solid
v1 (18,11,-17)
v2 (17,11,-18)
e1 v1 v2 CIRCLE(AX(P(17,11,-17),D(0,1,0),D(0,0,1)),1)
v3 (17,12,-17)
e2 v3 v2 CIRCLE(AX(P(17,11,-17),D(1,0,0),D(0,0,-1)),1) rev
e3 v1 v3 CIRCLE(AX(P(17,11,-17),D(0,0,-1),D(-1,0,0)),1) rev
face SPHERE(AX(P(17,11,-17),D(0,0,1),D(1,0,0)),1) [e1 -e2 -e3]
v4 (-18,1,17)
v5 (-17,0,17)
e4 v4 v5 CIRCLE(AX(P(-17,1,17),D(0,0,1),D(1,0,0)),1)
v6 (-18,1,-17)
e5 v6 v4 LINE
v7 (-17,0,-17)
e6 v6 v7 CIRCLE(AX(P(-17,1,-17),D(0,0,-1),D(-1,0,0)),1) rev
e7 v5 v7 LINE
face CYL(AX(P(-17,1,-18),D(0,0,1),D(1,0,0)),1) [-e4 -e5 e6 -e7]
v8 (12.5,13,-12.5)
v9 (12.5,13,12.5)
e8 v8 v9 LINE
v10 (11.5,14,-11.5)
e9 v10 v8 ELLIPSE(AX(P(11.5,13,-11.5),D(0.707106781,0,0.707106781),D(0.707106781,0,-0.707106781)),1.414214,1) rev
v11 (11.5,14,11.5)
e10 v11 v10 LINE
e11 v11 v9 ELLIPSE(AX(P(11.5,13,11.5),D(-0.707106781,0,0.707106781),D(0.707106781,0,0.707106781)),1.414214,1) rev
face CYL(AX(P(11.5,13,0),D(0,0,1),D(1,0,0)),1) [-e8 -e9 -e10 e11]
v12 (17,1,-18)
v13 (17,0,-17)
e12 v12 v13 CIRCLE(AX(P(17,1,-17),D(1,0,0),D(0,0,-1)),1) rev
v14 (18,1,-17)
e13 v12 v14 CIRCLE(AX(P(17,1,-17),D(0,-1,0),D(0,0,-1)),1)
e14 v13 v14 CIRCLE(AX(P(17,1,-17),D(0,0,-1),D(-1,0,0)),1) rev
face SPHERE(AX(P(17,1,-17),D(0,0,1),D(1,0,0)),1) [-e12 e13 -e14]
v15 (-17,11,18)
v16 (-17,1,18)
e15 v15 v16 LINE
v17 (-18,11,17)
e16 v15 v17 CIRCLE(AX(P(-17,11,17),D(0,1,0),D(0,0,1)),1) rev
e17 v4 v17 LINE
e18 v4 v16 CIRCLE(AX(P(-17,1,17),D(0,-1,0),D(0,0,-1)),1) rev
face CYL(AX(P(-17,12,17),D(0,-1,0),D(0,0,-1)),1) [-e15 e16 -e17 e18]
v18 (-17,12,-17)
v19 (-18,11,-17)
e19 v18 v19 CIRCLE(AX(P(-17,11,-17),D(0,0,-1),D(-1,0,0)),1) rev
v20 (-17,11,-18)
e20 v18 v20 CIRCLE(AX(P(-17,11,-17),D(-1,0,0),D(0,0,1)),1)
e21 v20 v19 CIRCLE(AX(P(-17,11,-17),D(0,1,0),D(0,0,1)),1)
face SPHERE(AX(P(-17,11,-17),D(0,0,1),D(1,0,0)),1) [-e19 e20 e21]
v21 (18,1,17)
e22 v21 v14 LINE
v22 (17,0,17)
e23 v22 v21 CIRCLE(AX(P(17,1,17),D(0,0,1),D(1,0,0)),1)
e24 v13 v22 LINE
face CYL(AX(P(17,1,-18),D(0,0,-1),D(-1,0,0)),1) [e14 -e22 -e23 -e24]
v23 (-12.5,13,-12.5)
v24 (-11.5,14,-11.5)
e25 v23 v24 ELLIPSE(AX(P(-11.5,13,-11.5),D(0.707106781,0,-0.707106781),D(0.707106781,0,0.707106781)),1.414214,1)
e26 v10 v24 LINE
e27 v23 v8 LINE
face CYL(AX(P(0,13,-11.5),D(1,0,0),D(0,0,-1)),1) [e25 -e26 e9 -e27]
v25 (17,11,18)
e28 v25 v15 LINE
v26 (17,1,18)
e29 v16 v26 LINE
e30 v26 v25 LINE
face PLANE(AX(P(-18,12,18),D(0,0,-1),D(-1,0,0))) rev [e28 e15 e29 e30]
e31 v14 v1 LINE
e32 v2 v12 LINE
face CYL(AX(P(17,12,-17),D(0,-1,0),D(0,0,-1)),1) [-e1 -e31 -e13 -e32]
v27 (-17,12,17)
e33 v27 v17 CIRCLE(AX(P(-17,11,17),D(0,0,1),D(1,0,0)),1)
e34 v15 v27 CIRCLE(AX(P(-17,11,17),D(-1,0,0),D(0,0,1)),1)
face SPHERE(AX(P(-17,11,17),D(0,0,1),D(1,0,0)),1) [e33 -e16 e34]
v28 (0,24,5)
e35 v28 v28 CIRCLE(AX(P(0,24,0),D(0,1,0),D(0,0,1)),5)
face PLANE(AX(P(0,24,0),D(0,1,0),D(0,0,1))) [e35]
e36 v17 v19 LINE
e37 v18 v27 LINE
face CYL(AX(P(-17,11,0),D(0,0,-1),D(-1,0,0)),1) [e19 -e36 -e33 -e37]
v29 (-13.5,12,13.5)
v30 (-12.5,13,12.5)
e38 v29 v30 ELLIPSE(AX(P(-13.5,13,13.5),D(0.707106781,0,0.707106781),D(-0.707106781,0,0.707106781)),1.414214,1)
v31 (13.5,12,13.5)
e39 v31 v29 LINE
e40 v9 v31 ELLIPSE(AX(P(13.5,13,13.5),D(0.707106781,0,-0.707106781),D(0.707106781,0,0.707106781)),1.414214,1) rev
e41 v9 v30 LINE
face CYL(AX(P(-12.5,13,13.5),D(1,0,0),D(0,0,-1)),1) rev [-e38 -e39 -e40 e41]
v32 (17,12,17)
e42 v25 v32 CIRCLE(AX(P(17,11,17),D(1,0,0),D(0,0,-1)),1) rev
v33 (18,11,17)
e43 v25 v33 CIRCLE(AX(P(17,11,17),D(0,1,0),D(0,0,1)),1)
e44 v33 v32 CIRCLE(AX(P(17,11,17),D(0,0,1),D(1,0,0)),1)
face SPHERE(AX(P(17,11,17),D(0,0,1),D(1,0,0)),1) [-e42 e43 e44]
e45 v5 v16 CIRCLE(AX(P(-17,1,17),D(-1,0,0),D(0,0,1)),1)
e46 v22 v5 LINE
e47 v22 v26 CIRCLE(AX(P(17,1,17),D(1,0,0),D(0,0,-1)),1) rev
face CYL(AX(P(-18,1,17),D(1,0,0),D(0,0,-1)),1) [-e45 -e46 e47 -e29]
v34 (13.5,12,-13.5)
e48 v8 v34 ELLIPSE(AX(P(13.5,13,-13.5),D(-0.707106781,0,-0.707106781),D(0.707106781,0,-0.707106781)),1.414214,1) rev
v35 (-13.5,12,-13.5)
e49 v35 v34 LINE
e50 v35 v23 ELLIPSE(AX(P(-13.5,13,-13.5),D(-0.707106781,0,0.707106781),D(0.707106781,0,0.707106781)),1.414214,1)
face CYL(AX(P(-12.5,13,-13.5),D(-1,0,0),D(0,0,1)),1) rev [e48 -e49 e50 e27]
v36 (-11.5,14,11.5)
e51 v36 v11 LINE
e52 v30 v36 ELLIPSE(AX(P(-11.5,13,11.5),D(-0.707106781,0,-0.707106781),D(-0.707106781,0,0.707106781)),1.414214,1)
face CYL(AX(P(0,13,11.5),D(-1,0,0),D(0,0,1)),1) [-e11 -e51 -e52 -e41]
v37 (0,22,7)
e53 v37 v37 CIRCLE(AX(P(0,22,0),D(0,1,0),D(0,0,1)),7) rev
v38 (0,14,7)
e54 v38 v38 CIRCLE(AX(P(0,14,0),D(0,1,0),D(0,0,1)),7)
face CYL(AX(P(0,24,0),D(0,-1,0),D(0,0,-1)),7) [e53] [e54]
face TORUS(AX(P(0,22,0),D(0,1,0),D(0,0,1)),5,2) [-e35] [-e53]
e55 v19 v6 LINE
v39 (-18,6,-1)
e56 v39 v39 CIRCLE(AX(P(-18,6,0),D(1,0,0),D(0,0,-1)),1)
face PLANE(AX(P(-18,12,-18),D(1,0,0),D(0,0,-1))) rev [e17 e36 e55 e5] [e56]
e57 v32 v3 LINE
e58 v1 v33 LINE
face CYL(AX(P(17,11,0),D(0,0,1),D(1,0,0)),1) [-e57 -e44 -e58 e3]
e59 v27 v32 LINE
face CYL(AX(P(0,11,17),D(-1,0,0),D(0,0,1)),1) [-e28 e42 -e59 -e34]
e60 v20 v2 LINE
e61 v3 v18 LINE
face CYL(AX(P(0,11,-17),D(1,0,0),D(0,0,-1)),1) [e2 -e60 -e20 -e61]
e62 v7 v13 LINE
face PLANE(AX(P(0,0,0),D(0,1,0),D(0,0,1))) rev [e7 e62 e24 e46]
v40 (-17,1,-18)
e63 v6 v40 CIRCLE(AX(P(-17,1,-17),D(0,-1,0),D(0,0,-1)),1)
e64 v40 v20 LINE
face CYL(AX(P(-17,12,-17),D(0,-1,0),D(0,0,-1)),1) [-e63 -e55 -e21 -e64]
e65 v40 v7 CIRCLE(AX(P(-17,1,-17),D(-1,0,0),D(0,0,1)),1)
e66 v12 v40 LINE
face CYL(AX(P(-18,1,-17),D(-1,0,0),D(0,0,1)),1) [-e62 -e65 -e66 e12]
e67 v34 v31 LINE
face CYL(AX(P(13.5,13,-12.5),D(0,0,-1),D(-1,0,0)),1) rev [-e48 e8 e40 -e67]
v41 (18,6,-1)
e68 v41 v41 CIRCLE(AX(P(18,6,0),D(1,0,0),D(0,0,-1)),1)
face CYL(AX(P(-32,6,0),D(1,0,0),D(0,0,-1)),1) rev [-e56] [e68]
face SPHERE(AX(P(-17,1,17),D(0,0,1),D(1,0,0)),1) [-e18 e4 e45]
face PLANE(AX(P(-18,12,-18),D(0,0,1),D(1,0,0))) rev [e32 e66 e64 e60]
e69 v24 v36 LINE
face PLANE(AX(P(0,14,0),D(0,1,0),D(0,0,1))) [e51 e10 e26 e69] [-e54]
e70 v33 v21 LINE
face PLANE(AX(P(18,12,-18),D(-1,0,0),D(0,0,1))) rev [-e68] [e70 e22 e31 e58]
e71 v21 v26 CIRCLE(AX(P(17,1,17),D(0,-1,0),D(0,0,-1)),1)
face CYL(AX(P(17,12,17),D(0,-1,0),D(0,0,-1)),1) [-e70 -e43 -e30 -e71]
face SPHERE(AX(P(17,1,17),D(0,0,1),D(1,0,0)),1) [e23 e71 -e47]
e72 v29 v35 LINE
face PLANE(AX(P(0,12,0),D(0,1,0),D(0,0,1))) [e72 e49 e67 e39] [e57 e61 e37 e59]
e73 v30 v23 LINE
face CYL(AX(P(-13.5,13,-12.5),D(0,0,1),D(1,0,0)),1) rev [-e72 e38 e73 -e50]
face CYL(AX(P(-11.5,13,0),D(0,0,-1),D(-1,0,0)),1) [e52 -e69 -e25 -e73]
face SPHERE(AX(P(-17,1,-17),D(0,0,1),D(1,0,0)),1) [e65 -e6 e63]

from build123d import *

# Parameters (mm, degrees)
SKETCH_1_W          = 36
SKETCH_1_H          = 36
EXTRUDE_1_DEPTH     = 12
SKETCH_2_W          = 25
SKETCH_2_H          = 25
EXTRUDE_2_DEPTH     = 2
SKETCH_3_R          = 7
EXTRUDE_3_DEPTH     = 10
FILLET_1_R          = 2
FILLET_2_R          = 1
FILLET_3_R          = 1
SKETCH_4_R          = 1
CUT_EXTRUDE_1_DEPTH = 50


with BuildPart() as part:
    # 草图1 → 凸台-拉伸1 (new body)
    with BuildSketch(Plane(origin=(0, 0, 0), x_dir=(1, 0, 0), z_dir=(0, 1, 0))):
        Rectangle(SKETCH_1_W, SKETCH_1_H)
    extrude(amount=EXTRUDE_1_DEPTH)

    # 草图2 → 凸台-拉伸2 (add)
    with BuildSketch(Plane(origin=(0, 12, 0), x_dir=(1, 0, 0), z_dir=(0, 1, 0))):
        Rectangle(SKETCH_2_W, SKETCH_2_H)
    extrude(amount=EXTRUDE_2_DEPTH)

    # 草图3 → 凸台-拉伸3 (add)
    with BuildSketch(Plane(origin=(0, 14, 0), x_dir=(1, 0, 0), z_dir=(0, 1, 0))):
        with Locations(Location((0, 0, 0), (0, 0, 270))):
            Circle(SKETCH_3_R)
    extrude(amount=EXTRUDE_3_DEPTH)

    # 圆角1
    fillet_1_edges = [part.edges().sort_by_distance(p)[0] for p in [
        (0, 24, -7),
    ]]
    fillet(fillet_1_edges, radius=FILLET_1_R)

    # 圆角2
    fillet_2_edges = [part.edges().sort_by_distance(p)[0] for p in [
        (0, 12, -12.5),
        (12.5, 12, 0),
        (0, 12, 12.5),
        (-12.5, 14, 0),
        (-12.5, 12, 0),
        (0, 14, 12.5),
        (12.5, 14, 0),
        (0, 14, -12.5),
    ]]
    fillet(fillet_2_edges, radius=FILLET_2_R - 0.0001)  # a hair under: the kernel refuses the full size

    # 圆角3
    fillet_3_edges = [part.edges().sort_by_distance(p)[0] for p in [
        (-18, 12, 0),
        (0, 12, 18),
        (18, 12, 0),
        (0, 0, 18),
        (-18, 0, 0),
        (0, 0, -18),
        (18, 0, 0),
        (18, 6, 18),
        (-18, 6, 18),
        (-18, 6, -18),
        (18, 6, -18),
        (0, 12, -18),
    ]]
    fillet(fillet_3_edges, radius=FILLET_3_R)

    # 草图4 → 切除-拉伸1 (cut)
    with BuildSketch(Plane(origin=(18, 0, 0), x_dir=(0, 0, -1), z_dir=(1, 0, 0))):
        with Locations((0, 6)):
            Circle(SKETCH_4_R)
    extrude(amount=-CUT_EXTRUDE_1_DEPTH, mode=Mode.SUBTRACT)


solid = part.part
